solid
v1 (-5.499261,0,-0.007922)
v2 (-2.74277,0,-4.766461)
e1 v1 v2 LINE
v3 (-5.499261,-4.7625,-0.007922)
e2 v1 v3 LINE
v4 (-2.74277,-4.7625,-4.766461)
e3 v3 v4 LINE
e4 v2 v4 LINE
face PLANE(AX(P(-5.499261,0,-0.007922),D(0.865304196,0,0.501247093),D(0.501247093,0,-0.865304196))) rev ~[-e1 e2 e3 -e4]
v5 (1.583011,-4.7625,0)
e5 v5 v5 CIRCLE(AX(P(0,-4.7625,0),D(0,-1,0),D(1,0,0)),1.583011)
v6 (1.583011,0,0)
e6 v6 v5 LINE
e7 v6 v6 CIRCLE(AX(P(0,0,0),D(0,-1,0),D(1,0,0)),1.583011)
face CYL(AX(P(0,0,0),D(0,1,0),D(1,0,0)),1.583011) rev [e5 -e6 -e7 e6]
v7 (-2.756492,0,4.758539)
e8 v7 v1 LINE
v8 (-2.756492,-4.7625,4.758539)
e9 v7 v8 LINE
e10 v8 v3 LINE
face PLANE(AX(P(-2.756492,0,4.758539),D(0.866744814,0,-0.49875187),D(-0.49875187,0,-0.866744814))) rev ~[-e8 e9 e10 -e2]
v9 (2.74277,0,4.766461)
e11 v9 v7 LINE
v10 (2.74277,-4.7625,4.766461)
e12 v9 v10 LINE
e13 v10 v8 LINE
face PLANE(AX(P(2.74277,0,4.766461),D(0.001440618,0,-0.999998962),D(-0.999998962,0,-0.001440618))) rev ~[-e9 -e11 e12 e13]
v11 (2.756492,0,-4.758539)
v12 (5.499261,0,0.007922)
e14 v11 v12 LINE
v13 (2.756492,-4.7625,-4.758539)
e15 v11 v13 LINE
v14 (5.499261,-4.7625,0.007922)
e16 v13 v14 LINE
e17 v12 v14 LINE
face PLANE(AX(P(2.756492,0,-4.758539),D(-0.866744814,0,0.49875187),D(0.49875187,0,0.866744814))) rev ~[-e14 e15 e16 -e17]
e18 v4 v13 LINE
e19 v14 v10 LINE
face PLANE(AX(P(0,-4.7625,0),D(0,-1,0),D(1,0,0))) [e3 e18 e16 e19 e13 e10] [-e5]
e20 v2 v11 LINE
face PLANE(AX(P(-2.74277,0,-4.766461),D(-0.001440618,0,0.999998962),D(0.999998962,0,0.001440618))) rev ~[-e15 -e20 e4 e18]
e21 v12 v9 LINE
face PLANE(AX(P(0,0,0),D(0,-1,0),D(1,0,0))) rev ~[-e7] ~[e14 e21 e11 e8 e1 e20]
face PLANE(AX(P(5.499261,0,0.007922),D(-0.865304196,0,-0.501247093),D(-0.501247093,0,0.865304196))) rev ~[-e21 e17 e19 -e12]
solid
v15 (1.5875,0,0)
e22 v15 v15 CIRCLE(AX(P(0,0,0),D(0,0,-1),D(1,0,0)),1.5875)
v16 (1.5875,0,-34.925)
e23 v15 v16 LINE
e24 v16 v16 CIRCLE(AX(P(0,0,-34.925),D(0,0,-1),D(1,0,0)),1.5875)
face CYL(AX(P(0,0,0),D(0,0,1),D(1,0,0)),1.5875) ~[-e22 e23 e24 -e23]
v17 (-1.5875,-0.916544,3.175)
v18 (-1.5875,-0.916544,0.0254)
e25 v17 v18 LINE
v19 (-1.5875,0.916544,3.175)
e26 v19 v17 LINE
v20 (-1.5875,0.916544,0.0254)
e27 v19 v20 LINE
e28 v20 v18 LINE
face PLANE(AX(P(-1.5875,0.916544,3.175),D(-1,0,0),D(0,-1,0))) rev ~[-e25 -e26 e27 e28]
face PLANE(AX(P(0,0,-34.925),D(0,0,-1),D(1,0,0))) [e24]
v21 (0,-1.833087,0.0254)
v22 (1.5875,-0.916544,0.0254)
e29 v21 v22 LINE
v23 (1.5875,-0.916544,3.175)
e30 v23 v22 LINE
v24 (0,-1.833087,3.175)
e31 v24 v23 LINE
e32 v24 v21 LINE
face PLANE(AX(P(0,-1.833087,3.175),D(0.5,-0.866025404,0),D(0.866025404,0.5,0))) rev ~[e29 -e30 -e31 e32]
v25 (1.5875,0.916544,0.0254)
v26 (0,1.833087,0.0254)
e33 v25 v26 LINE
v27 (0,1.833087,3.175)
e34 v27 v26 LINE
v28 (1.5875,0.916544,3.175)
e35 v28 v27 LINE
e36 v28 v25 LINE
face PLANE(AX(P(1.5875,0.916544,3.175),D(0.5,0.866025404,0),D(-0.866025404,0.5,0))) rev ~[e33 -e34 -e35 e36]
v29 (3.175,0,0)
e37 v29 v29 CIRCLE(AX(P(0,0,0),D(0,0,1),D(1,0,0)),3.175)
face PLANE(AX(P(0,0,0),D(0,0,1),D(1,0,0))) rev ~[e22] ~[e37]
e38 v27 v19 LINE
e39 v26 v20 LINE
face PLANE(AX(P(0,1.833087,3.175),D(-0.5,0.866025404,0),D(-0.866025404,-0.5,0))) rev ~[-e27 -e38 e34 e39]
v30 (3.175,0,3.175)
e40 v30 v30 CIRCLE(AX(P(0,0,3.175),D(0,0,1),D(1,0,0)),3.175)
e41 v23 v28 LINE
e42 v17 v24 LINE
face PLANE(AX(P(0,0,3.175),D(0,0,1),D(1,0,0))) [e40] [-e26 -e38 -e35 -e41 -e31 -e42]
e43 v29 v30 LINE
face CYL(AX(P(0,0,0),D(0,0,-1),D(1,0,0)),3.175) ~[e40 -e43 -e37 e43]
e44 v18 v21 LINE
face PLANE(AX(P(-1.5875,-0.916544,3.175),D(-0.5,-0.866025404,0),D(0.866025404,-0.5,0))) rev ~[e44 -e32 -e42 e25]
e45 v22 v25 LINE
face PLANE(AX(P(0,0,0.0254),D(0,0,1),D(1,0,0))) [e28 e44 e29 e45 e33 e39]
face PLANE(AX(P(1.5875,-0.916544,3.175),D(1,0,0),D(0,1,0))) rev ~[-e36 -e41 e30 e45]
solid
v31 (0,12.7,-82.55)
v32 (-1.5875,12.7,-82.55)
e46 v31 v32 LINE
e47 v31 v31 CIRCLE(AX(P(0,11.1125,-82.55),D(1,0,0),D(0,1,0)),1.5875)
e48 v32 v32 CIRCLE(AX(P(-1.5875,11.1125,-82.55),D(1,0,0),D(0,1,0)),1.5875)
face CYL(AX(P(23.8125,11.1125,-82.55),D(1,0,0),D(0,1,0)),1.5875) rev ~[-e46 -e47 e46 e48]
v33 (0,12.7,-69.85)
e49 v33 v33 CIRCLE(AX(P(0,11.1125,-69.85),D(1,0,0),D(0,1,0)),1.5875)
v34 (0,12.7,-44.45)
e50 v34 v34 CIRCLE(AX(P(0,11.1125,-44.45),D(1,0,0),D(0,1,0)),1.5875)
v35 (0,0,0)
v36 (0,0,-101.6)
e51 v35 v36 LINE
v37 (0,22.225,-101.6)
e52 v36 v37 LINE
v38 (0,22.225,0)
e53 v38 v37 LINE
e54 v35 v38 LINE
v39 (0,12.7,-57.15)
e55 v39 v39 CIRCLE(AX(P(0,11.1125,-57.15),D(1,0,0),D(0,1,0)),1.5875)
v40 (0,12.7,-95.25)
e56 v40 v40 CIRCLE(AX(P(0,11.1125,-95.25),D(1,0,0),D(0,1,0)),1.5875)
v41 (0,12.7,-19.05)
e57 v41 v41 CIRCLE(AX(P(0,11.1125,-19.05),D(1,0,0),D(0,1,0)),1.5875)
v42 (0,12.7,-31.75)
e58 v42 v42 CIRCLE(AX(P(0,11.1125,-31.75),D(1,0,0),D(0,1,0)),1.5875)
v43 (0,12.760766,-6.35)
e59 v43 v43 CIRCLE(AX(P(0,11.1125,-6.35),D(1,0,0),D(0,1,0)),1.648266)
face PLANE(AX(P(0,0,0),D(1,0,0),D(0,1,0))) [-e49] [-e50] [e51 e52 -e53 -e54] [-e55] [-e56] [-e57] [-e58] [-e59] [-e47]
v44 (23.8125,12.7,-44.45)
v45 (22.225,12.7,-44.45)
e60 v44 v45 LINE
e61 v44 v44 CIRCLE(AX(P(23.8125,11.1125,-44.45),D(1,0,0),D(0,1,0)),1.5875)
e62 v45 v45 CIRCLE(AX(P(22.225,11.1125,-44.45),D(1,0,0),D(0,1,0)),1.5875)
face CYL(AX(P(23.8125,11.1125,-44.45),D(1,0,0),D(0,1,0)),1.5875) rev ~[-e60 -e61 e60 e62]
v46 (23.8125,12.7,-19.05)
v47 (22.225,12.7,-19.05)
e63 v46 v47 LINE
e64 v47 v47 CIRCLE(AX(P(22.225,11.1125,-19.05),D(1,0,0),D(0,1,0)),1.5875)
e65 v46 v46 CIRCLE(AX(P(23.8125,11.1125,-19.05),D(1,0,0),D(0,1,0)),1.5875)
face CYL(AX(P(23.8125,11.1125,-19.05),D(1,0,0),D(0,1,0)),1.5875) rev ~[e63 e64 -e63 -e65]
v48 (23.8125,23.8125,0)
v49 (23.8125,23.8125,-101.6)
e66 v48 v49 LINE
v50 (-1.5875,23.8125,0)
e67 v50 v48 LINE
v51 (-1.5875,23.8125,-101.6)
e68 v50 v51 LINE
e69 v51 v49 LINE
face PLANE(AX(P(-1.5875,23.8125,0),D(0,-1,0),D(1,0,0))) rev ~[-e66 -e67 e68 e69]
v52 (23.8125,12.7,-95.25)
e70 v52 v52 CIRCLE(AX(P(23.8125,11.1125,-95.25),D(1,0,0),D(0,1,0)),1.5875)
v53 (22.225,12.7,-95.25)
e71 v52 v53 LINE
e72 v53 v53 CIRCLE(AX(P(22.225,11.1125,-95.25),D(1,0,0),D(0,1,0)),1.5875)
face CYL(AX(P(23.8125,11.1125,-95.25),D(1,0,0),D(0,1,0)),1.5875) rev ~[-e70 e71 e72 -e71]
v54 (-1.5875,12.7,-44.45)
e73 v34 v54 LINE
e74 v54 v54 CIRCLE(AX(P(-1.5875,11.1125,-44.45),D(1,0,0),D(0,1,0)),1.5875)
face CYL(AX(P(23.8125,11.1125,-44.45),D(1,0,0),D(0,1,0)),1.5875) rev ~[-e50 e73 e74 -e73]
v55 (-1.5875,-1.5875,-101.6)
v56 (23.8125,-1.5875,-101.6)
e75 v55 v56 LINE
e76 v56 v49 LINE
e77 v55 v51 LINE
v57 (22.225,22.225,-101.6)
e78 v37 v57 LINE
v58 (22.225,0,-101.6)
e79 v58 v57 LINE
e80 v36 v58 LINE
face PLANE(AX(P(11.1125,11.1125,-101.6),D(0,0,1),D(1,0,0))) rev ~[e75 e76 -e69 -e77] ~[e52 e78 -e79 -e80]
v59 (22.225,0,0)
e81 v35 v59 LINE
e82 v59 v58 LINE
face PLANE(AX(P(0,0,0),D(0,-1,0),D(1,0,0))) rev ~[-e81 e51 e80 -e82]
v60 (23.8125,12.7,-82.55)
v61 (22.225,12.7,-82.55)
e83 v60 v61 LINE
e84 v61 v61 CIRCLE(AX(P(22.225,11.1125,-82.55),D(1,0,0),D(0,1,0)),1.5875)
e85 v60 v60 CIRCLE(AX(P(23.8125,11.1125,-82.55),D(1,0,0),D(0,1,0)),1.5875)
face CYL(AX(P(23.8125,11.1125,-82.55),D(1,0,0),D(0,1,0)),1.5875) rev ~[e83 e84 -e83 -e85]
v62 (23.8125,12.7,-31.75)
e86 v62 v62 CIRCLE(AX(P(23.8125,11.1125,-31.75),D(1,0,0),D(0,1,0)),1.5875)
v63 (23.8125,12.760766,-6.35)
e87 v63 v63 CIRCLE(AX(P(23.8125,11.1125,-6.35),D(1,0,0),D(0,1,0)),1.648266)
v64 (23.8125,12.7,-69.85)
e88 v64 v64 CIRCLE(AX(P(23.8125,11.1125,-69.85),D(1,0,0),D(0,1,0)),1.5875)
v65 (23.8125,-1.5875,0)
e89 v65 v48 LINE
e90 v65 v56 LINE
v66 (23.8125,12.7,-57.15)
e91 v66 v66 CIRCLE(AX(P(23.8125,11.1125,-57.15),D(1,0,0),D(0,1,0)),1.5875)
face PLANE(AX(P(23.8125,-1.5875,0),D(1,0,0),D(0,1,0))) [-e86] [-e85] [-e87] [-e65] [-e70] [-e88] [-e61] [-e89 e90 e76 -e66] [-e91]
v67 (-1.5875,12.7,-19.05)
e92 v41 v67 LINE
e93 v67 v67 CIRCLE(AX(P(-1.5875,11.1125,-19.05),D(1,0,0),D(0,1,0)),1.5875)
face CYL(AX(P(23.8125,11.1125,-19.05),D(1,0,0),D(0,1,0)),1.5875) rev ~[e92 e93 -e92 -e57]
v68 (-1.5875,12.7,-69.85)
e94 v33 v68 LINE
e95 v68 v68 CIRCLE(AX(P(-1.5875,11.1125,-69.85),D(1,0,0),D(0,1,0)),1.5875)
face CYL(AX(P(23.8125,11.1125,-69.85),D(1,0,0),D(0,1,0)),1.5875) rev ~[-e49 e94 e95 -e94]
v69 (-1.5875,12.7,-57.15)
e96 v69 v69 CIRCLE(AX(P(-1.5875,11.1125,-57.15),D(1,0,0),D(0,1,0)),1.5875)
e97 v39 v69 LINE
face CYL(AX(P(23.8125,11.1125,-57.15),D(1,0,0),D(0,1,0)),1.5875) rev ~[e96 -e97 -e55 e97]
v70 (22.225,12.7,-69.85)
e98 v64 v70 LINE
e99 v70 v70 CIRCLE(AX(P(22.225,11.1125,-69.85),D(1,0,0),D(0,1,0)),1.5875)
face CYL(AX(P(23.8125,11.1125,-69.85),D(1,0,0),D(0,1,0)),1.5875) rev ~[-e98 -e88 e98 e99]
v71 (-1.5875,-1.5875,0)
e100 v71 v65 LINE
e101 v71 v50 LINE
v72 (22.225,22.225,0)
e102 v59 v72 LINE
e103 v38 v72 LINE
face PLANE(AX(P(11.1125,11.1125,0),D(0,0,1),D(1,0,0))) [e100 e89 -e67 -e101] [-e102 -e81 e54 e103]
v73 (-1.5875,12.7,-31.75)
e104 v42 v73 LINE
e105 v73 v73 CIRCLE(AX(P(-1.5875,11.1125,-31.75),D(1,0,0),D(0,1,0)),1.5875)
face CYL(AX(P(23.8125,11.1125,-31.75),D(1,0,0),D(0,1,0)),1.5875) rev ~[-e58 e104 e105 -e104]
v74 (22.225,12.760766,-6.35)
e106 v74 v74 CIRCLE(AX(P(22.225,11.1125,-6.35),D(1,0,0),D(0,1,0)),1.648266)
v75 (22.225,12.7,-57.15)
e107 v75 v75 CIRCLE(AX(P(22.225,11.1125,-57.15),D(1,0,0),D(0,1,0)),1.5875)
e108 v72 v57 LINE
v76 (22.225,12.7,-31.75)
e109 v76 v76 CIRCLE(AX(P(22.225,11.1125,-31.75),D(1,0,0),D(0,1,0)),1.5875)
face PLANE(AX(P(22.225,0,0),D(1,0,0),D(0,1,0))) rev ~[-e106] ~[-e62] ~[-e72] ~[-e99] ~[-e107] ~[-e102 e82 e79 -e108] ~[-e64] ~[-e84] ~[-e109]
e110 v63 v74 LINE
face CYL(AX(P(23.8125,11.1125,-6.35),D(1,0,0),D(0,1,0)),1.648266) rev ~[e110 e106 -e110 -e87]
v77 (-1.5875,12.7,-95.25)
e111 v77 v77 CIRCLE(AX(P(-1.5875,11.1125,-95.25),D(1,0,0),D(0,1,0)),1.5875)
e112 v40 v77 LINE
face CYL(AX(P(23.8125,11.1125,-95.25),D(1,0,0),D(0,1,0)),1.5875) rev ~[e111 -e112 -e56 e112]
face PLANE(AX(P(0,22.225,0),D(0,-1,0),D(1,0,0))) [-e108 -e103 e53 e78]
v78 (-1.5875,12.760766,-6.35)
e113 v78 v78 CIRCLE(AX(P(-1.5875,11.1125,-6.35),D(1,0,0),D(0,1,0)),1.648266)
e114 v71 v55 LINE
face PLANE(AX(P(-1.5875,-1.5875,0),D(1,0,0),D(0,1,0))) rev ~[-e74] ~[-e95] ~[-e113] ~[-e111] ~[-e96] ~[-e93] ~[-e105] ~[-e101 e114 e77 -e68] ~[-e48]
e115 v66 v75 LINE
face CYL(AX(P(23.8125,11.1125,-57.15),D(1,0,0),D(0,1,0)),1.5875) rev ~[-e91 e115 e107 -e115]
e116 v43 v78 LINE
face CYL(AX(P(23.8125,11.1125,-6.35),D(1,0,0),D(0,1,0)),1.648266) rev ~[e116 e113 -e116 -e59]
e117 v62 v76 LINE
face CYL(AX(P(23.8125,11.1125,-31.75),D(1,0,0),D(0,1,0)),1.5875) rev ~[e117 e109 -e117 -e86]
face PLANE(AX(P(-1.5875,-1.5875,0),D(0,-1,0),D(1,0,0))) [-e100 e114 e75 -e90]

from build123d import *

# Parameters (mm, degrees)
F2_DEPTH  = 4.7625
F1_R      = 1.58301057
F3_DEPTH  = 4.7625
F4_R      = 3.175
F5_DEPTH  = 3.175
F6_R      = 1.5875
F7_DEPTH  = 34.925
F9_DEPTH  = 3.1496
F11_W     = 25.4
F11_H     = 25.4
F12_DEPTH = 101.6
F10_W     = 22.225
F10_H     = 22.225
F13_DEPTH = 101.6
F14_R     = 1.6482662837
F22_DEPTH = 25.4
F15_R     = 1.5875
F23_DEPTH = 25.4
F21_R     = 1.5875
F24_DEPTH = 25.4
F20_R     = 1.5875
F25_DEPTH = 25.4
F19_R     = 1.5875
F26_DEPTH = 25.4
F18_R     = 1.5875
F27_DEPTH = 25.4
F17_R     = 1.5875
F28_DEPTH = 25.4
F16_R     = 1.5875
F29_DEPTH = 25.4


with BuildPart() as f2:
    # F0 (on Front) → F2 (new body)
    with BuildSketch(Plane.XZ):
        Polygon((2.7564916063, -4.7585388291), (5.499261314, 0.0079223418), (2.7427697078, 4.7664611709), (-2.7564916063, 4.7585388291), (-5.499261314, -0.0079223418), (-2.7427697078, -4.7664611709), align=None)
    extrude(amount=F2_DEPTH)

    # F1 (on face) → F3 (cut)
    with BuildSketch(Plane.XZ):
        Circle(F1_R)
    extrude(amount=F3_DEPTH, mode=Mode.SUBTRACT)


with BuildPart() as f5:
    # F4 (on Top) → F5 (new body)
    with BuildSketch(Plane.XY):
        Circle(F4_R)
    extrude(amount=F5_DEPTH)

    # F6 (on face) → F7 (join)
    with BuildSketch(Plane(origin=(0, 0, 0), x_dir=(1, 0, 0), z_dir=(0, 0, -1))):
        Circle(F6_R)
    extrude(amount=F7_DEPTH)

    # F8 (on face) → F9 (cut)
    with BuildSketch(Plane.XY.offset(3.175)):
        Polygon((-1.5875, 0.9165435523), (-1.5875, -0.9165435523), (0, -1.8330871047), (1.5875, -0.9165435523), (1.5875, 0.9165435523), (0, 1.8330871047), align=None)
    extrude(amount=-F9_DEPTH, mode=Mode.SUBTRACT)


with BuildPart() as f12:
    # F11 (on Top) → F12 (new body)
    with BuildSketch(Plane.XY):
        with Locations((11.1125, 11.1125)):
            Rectangle(F11_W, F11_H)
    extrude(amount=-F12_DEPTH)

    # F10 (on Top) → F13 (cut)
    with BuildSketch(Plane.XY):
        with Locations((11.1125, 11.1125)):
            Rectangle(F10_W, F10_H)
    extrude(amount=-F13_DEPTH, mode=Mode.SUBTRACT)

    # F14 (on face) → F22 (cut)
    with BuildSketch(Plane.YZ.offset(23.8125)):
        with Locations((11.1125, -6.35)):
            Circle(F14_R)
    extrude(amount=-F22_DEPTH, mode=Mode.SUBTRACT)

    # F15 (on face) → F23 (cut)
    with BuildSketch(Plane.YZ.offset(23.8125)):
        with Locations((11.1125, -19.05)):
            Circle(F15_R)
    extrude(amount=-F23_DEPTH, mode=Mode.SUBTRACT)

    # F21 (on face) → F24 (cut)
    with BuildSketch(Plane.YZ.offset(23.8125)):
        with Locations((11.1125, -95.25)):
            Circle(F21_R)
    extrude(amount=-F24_DEPTH, mode=Mode.SUBTRACT)

    # F20 (on face) → F25 (cut)
    with BuildSketch(Plane.YZ.offset(23.8125)):
        with Locations((11.1125, -82.55)):
            Circle(F20_R)
    extrude(amount=-F25_DEPTH, mode=Mode.SUBTRACT)

    # F19 (on face) → F26 (cut)
    with BuildSketch(Plane.YZ.offset(23.8125)):
        with Locations((11.1125, -69.85)):
            Circle(F19_R)
    extrude(amount=-F26_DEPTH, mode=Mode.SUBTRACT)

    # F18 (on face) → F27 (cut)
    with BuildSketch(Plane.YZ.offset(23.8125)):
        with Locations((11.1125, -57.15)):
            Circle(F18_R)
    extrude(amount=-F27_DEPTH, mode=Mode.SUBTRACT)

    # F17 (on face) → F28 (cut)
    with BuildSketch(Plane.YZ.offset(23.8125)):
        with Locations((11.1125, -44.45)):
            Circle(F17_R)
    extrude(amount=-F28_DEPTH, mode=Mode.SUBTRACT)

    # F16 (on face) → F29 (cut)
    with BuildSketch(Plane.YZ.offset(23.8125)):
        with Locations((11.1125, -31.75)):
            Circle(F16_R)
    extrude(amount=-F29_DEPTH, mode=Mode.SUBTRACT)


solid = Compound([f2.part, f5.part, f12.part])
